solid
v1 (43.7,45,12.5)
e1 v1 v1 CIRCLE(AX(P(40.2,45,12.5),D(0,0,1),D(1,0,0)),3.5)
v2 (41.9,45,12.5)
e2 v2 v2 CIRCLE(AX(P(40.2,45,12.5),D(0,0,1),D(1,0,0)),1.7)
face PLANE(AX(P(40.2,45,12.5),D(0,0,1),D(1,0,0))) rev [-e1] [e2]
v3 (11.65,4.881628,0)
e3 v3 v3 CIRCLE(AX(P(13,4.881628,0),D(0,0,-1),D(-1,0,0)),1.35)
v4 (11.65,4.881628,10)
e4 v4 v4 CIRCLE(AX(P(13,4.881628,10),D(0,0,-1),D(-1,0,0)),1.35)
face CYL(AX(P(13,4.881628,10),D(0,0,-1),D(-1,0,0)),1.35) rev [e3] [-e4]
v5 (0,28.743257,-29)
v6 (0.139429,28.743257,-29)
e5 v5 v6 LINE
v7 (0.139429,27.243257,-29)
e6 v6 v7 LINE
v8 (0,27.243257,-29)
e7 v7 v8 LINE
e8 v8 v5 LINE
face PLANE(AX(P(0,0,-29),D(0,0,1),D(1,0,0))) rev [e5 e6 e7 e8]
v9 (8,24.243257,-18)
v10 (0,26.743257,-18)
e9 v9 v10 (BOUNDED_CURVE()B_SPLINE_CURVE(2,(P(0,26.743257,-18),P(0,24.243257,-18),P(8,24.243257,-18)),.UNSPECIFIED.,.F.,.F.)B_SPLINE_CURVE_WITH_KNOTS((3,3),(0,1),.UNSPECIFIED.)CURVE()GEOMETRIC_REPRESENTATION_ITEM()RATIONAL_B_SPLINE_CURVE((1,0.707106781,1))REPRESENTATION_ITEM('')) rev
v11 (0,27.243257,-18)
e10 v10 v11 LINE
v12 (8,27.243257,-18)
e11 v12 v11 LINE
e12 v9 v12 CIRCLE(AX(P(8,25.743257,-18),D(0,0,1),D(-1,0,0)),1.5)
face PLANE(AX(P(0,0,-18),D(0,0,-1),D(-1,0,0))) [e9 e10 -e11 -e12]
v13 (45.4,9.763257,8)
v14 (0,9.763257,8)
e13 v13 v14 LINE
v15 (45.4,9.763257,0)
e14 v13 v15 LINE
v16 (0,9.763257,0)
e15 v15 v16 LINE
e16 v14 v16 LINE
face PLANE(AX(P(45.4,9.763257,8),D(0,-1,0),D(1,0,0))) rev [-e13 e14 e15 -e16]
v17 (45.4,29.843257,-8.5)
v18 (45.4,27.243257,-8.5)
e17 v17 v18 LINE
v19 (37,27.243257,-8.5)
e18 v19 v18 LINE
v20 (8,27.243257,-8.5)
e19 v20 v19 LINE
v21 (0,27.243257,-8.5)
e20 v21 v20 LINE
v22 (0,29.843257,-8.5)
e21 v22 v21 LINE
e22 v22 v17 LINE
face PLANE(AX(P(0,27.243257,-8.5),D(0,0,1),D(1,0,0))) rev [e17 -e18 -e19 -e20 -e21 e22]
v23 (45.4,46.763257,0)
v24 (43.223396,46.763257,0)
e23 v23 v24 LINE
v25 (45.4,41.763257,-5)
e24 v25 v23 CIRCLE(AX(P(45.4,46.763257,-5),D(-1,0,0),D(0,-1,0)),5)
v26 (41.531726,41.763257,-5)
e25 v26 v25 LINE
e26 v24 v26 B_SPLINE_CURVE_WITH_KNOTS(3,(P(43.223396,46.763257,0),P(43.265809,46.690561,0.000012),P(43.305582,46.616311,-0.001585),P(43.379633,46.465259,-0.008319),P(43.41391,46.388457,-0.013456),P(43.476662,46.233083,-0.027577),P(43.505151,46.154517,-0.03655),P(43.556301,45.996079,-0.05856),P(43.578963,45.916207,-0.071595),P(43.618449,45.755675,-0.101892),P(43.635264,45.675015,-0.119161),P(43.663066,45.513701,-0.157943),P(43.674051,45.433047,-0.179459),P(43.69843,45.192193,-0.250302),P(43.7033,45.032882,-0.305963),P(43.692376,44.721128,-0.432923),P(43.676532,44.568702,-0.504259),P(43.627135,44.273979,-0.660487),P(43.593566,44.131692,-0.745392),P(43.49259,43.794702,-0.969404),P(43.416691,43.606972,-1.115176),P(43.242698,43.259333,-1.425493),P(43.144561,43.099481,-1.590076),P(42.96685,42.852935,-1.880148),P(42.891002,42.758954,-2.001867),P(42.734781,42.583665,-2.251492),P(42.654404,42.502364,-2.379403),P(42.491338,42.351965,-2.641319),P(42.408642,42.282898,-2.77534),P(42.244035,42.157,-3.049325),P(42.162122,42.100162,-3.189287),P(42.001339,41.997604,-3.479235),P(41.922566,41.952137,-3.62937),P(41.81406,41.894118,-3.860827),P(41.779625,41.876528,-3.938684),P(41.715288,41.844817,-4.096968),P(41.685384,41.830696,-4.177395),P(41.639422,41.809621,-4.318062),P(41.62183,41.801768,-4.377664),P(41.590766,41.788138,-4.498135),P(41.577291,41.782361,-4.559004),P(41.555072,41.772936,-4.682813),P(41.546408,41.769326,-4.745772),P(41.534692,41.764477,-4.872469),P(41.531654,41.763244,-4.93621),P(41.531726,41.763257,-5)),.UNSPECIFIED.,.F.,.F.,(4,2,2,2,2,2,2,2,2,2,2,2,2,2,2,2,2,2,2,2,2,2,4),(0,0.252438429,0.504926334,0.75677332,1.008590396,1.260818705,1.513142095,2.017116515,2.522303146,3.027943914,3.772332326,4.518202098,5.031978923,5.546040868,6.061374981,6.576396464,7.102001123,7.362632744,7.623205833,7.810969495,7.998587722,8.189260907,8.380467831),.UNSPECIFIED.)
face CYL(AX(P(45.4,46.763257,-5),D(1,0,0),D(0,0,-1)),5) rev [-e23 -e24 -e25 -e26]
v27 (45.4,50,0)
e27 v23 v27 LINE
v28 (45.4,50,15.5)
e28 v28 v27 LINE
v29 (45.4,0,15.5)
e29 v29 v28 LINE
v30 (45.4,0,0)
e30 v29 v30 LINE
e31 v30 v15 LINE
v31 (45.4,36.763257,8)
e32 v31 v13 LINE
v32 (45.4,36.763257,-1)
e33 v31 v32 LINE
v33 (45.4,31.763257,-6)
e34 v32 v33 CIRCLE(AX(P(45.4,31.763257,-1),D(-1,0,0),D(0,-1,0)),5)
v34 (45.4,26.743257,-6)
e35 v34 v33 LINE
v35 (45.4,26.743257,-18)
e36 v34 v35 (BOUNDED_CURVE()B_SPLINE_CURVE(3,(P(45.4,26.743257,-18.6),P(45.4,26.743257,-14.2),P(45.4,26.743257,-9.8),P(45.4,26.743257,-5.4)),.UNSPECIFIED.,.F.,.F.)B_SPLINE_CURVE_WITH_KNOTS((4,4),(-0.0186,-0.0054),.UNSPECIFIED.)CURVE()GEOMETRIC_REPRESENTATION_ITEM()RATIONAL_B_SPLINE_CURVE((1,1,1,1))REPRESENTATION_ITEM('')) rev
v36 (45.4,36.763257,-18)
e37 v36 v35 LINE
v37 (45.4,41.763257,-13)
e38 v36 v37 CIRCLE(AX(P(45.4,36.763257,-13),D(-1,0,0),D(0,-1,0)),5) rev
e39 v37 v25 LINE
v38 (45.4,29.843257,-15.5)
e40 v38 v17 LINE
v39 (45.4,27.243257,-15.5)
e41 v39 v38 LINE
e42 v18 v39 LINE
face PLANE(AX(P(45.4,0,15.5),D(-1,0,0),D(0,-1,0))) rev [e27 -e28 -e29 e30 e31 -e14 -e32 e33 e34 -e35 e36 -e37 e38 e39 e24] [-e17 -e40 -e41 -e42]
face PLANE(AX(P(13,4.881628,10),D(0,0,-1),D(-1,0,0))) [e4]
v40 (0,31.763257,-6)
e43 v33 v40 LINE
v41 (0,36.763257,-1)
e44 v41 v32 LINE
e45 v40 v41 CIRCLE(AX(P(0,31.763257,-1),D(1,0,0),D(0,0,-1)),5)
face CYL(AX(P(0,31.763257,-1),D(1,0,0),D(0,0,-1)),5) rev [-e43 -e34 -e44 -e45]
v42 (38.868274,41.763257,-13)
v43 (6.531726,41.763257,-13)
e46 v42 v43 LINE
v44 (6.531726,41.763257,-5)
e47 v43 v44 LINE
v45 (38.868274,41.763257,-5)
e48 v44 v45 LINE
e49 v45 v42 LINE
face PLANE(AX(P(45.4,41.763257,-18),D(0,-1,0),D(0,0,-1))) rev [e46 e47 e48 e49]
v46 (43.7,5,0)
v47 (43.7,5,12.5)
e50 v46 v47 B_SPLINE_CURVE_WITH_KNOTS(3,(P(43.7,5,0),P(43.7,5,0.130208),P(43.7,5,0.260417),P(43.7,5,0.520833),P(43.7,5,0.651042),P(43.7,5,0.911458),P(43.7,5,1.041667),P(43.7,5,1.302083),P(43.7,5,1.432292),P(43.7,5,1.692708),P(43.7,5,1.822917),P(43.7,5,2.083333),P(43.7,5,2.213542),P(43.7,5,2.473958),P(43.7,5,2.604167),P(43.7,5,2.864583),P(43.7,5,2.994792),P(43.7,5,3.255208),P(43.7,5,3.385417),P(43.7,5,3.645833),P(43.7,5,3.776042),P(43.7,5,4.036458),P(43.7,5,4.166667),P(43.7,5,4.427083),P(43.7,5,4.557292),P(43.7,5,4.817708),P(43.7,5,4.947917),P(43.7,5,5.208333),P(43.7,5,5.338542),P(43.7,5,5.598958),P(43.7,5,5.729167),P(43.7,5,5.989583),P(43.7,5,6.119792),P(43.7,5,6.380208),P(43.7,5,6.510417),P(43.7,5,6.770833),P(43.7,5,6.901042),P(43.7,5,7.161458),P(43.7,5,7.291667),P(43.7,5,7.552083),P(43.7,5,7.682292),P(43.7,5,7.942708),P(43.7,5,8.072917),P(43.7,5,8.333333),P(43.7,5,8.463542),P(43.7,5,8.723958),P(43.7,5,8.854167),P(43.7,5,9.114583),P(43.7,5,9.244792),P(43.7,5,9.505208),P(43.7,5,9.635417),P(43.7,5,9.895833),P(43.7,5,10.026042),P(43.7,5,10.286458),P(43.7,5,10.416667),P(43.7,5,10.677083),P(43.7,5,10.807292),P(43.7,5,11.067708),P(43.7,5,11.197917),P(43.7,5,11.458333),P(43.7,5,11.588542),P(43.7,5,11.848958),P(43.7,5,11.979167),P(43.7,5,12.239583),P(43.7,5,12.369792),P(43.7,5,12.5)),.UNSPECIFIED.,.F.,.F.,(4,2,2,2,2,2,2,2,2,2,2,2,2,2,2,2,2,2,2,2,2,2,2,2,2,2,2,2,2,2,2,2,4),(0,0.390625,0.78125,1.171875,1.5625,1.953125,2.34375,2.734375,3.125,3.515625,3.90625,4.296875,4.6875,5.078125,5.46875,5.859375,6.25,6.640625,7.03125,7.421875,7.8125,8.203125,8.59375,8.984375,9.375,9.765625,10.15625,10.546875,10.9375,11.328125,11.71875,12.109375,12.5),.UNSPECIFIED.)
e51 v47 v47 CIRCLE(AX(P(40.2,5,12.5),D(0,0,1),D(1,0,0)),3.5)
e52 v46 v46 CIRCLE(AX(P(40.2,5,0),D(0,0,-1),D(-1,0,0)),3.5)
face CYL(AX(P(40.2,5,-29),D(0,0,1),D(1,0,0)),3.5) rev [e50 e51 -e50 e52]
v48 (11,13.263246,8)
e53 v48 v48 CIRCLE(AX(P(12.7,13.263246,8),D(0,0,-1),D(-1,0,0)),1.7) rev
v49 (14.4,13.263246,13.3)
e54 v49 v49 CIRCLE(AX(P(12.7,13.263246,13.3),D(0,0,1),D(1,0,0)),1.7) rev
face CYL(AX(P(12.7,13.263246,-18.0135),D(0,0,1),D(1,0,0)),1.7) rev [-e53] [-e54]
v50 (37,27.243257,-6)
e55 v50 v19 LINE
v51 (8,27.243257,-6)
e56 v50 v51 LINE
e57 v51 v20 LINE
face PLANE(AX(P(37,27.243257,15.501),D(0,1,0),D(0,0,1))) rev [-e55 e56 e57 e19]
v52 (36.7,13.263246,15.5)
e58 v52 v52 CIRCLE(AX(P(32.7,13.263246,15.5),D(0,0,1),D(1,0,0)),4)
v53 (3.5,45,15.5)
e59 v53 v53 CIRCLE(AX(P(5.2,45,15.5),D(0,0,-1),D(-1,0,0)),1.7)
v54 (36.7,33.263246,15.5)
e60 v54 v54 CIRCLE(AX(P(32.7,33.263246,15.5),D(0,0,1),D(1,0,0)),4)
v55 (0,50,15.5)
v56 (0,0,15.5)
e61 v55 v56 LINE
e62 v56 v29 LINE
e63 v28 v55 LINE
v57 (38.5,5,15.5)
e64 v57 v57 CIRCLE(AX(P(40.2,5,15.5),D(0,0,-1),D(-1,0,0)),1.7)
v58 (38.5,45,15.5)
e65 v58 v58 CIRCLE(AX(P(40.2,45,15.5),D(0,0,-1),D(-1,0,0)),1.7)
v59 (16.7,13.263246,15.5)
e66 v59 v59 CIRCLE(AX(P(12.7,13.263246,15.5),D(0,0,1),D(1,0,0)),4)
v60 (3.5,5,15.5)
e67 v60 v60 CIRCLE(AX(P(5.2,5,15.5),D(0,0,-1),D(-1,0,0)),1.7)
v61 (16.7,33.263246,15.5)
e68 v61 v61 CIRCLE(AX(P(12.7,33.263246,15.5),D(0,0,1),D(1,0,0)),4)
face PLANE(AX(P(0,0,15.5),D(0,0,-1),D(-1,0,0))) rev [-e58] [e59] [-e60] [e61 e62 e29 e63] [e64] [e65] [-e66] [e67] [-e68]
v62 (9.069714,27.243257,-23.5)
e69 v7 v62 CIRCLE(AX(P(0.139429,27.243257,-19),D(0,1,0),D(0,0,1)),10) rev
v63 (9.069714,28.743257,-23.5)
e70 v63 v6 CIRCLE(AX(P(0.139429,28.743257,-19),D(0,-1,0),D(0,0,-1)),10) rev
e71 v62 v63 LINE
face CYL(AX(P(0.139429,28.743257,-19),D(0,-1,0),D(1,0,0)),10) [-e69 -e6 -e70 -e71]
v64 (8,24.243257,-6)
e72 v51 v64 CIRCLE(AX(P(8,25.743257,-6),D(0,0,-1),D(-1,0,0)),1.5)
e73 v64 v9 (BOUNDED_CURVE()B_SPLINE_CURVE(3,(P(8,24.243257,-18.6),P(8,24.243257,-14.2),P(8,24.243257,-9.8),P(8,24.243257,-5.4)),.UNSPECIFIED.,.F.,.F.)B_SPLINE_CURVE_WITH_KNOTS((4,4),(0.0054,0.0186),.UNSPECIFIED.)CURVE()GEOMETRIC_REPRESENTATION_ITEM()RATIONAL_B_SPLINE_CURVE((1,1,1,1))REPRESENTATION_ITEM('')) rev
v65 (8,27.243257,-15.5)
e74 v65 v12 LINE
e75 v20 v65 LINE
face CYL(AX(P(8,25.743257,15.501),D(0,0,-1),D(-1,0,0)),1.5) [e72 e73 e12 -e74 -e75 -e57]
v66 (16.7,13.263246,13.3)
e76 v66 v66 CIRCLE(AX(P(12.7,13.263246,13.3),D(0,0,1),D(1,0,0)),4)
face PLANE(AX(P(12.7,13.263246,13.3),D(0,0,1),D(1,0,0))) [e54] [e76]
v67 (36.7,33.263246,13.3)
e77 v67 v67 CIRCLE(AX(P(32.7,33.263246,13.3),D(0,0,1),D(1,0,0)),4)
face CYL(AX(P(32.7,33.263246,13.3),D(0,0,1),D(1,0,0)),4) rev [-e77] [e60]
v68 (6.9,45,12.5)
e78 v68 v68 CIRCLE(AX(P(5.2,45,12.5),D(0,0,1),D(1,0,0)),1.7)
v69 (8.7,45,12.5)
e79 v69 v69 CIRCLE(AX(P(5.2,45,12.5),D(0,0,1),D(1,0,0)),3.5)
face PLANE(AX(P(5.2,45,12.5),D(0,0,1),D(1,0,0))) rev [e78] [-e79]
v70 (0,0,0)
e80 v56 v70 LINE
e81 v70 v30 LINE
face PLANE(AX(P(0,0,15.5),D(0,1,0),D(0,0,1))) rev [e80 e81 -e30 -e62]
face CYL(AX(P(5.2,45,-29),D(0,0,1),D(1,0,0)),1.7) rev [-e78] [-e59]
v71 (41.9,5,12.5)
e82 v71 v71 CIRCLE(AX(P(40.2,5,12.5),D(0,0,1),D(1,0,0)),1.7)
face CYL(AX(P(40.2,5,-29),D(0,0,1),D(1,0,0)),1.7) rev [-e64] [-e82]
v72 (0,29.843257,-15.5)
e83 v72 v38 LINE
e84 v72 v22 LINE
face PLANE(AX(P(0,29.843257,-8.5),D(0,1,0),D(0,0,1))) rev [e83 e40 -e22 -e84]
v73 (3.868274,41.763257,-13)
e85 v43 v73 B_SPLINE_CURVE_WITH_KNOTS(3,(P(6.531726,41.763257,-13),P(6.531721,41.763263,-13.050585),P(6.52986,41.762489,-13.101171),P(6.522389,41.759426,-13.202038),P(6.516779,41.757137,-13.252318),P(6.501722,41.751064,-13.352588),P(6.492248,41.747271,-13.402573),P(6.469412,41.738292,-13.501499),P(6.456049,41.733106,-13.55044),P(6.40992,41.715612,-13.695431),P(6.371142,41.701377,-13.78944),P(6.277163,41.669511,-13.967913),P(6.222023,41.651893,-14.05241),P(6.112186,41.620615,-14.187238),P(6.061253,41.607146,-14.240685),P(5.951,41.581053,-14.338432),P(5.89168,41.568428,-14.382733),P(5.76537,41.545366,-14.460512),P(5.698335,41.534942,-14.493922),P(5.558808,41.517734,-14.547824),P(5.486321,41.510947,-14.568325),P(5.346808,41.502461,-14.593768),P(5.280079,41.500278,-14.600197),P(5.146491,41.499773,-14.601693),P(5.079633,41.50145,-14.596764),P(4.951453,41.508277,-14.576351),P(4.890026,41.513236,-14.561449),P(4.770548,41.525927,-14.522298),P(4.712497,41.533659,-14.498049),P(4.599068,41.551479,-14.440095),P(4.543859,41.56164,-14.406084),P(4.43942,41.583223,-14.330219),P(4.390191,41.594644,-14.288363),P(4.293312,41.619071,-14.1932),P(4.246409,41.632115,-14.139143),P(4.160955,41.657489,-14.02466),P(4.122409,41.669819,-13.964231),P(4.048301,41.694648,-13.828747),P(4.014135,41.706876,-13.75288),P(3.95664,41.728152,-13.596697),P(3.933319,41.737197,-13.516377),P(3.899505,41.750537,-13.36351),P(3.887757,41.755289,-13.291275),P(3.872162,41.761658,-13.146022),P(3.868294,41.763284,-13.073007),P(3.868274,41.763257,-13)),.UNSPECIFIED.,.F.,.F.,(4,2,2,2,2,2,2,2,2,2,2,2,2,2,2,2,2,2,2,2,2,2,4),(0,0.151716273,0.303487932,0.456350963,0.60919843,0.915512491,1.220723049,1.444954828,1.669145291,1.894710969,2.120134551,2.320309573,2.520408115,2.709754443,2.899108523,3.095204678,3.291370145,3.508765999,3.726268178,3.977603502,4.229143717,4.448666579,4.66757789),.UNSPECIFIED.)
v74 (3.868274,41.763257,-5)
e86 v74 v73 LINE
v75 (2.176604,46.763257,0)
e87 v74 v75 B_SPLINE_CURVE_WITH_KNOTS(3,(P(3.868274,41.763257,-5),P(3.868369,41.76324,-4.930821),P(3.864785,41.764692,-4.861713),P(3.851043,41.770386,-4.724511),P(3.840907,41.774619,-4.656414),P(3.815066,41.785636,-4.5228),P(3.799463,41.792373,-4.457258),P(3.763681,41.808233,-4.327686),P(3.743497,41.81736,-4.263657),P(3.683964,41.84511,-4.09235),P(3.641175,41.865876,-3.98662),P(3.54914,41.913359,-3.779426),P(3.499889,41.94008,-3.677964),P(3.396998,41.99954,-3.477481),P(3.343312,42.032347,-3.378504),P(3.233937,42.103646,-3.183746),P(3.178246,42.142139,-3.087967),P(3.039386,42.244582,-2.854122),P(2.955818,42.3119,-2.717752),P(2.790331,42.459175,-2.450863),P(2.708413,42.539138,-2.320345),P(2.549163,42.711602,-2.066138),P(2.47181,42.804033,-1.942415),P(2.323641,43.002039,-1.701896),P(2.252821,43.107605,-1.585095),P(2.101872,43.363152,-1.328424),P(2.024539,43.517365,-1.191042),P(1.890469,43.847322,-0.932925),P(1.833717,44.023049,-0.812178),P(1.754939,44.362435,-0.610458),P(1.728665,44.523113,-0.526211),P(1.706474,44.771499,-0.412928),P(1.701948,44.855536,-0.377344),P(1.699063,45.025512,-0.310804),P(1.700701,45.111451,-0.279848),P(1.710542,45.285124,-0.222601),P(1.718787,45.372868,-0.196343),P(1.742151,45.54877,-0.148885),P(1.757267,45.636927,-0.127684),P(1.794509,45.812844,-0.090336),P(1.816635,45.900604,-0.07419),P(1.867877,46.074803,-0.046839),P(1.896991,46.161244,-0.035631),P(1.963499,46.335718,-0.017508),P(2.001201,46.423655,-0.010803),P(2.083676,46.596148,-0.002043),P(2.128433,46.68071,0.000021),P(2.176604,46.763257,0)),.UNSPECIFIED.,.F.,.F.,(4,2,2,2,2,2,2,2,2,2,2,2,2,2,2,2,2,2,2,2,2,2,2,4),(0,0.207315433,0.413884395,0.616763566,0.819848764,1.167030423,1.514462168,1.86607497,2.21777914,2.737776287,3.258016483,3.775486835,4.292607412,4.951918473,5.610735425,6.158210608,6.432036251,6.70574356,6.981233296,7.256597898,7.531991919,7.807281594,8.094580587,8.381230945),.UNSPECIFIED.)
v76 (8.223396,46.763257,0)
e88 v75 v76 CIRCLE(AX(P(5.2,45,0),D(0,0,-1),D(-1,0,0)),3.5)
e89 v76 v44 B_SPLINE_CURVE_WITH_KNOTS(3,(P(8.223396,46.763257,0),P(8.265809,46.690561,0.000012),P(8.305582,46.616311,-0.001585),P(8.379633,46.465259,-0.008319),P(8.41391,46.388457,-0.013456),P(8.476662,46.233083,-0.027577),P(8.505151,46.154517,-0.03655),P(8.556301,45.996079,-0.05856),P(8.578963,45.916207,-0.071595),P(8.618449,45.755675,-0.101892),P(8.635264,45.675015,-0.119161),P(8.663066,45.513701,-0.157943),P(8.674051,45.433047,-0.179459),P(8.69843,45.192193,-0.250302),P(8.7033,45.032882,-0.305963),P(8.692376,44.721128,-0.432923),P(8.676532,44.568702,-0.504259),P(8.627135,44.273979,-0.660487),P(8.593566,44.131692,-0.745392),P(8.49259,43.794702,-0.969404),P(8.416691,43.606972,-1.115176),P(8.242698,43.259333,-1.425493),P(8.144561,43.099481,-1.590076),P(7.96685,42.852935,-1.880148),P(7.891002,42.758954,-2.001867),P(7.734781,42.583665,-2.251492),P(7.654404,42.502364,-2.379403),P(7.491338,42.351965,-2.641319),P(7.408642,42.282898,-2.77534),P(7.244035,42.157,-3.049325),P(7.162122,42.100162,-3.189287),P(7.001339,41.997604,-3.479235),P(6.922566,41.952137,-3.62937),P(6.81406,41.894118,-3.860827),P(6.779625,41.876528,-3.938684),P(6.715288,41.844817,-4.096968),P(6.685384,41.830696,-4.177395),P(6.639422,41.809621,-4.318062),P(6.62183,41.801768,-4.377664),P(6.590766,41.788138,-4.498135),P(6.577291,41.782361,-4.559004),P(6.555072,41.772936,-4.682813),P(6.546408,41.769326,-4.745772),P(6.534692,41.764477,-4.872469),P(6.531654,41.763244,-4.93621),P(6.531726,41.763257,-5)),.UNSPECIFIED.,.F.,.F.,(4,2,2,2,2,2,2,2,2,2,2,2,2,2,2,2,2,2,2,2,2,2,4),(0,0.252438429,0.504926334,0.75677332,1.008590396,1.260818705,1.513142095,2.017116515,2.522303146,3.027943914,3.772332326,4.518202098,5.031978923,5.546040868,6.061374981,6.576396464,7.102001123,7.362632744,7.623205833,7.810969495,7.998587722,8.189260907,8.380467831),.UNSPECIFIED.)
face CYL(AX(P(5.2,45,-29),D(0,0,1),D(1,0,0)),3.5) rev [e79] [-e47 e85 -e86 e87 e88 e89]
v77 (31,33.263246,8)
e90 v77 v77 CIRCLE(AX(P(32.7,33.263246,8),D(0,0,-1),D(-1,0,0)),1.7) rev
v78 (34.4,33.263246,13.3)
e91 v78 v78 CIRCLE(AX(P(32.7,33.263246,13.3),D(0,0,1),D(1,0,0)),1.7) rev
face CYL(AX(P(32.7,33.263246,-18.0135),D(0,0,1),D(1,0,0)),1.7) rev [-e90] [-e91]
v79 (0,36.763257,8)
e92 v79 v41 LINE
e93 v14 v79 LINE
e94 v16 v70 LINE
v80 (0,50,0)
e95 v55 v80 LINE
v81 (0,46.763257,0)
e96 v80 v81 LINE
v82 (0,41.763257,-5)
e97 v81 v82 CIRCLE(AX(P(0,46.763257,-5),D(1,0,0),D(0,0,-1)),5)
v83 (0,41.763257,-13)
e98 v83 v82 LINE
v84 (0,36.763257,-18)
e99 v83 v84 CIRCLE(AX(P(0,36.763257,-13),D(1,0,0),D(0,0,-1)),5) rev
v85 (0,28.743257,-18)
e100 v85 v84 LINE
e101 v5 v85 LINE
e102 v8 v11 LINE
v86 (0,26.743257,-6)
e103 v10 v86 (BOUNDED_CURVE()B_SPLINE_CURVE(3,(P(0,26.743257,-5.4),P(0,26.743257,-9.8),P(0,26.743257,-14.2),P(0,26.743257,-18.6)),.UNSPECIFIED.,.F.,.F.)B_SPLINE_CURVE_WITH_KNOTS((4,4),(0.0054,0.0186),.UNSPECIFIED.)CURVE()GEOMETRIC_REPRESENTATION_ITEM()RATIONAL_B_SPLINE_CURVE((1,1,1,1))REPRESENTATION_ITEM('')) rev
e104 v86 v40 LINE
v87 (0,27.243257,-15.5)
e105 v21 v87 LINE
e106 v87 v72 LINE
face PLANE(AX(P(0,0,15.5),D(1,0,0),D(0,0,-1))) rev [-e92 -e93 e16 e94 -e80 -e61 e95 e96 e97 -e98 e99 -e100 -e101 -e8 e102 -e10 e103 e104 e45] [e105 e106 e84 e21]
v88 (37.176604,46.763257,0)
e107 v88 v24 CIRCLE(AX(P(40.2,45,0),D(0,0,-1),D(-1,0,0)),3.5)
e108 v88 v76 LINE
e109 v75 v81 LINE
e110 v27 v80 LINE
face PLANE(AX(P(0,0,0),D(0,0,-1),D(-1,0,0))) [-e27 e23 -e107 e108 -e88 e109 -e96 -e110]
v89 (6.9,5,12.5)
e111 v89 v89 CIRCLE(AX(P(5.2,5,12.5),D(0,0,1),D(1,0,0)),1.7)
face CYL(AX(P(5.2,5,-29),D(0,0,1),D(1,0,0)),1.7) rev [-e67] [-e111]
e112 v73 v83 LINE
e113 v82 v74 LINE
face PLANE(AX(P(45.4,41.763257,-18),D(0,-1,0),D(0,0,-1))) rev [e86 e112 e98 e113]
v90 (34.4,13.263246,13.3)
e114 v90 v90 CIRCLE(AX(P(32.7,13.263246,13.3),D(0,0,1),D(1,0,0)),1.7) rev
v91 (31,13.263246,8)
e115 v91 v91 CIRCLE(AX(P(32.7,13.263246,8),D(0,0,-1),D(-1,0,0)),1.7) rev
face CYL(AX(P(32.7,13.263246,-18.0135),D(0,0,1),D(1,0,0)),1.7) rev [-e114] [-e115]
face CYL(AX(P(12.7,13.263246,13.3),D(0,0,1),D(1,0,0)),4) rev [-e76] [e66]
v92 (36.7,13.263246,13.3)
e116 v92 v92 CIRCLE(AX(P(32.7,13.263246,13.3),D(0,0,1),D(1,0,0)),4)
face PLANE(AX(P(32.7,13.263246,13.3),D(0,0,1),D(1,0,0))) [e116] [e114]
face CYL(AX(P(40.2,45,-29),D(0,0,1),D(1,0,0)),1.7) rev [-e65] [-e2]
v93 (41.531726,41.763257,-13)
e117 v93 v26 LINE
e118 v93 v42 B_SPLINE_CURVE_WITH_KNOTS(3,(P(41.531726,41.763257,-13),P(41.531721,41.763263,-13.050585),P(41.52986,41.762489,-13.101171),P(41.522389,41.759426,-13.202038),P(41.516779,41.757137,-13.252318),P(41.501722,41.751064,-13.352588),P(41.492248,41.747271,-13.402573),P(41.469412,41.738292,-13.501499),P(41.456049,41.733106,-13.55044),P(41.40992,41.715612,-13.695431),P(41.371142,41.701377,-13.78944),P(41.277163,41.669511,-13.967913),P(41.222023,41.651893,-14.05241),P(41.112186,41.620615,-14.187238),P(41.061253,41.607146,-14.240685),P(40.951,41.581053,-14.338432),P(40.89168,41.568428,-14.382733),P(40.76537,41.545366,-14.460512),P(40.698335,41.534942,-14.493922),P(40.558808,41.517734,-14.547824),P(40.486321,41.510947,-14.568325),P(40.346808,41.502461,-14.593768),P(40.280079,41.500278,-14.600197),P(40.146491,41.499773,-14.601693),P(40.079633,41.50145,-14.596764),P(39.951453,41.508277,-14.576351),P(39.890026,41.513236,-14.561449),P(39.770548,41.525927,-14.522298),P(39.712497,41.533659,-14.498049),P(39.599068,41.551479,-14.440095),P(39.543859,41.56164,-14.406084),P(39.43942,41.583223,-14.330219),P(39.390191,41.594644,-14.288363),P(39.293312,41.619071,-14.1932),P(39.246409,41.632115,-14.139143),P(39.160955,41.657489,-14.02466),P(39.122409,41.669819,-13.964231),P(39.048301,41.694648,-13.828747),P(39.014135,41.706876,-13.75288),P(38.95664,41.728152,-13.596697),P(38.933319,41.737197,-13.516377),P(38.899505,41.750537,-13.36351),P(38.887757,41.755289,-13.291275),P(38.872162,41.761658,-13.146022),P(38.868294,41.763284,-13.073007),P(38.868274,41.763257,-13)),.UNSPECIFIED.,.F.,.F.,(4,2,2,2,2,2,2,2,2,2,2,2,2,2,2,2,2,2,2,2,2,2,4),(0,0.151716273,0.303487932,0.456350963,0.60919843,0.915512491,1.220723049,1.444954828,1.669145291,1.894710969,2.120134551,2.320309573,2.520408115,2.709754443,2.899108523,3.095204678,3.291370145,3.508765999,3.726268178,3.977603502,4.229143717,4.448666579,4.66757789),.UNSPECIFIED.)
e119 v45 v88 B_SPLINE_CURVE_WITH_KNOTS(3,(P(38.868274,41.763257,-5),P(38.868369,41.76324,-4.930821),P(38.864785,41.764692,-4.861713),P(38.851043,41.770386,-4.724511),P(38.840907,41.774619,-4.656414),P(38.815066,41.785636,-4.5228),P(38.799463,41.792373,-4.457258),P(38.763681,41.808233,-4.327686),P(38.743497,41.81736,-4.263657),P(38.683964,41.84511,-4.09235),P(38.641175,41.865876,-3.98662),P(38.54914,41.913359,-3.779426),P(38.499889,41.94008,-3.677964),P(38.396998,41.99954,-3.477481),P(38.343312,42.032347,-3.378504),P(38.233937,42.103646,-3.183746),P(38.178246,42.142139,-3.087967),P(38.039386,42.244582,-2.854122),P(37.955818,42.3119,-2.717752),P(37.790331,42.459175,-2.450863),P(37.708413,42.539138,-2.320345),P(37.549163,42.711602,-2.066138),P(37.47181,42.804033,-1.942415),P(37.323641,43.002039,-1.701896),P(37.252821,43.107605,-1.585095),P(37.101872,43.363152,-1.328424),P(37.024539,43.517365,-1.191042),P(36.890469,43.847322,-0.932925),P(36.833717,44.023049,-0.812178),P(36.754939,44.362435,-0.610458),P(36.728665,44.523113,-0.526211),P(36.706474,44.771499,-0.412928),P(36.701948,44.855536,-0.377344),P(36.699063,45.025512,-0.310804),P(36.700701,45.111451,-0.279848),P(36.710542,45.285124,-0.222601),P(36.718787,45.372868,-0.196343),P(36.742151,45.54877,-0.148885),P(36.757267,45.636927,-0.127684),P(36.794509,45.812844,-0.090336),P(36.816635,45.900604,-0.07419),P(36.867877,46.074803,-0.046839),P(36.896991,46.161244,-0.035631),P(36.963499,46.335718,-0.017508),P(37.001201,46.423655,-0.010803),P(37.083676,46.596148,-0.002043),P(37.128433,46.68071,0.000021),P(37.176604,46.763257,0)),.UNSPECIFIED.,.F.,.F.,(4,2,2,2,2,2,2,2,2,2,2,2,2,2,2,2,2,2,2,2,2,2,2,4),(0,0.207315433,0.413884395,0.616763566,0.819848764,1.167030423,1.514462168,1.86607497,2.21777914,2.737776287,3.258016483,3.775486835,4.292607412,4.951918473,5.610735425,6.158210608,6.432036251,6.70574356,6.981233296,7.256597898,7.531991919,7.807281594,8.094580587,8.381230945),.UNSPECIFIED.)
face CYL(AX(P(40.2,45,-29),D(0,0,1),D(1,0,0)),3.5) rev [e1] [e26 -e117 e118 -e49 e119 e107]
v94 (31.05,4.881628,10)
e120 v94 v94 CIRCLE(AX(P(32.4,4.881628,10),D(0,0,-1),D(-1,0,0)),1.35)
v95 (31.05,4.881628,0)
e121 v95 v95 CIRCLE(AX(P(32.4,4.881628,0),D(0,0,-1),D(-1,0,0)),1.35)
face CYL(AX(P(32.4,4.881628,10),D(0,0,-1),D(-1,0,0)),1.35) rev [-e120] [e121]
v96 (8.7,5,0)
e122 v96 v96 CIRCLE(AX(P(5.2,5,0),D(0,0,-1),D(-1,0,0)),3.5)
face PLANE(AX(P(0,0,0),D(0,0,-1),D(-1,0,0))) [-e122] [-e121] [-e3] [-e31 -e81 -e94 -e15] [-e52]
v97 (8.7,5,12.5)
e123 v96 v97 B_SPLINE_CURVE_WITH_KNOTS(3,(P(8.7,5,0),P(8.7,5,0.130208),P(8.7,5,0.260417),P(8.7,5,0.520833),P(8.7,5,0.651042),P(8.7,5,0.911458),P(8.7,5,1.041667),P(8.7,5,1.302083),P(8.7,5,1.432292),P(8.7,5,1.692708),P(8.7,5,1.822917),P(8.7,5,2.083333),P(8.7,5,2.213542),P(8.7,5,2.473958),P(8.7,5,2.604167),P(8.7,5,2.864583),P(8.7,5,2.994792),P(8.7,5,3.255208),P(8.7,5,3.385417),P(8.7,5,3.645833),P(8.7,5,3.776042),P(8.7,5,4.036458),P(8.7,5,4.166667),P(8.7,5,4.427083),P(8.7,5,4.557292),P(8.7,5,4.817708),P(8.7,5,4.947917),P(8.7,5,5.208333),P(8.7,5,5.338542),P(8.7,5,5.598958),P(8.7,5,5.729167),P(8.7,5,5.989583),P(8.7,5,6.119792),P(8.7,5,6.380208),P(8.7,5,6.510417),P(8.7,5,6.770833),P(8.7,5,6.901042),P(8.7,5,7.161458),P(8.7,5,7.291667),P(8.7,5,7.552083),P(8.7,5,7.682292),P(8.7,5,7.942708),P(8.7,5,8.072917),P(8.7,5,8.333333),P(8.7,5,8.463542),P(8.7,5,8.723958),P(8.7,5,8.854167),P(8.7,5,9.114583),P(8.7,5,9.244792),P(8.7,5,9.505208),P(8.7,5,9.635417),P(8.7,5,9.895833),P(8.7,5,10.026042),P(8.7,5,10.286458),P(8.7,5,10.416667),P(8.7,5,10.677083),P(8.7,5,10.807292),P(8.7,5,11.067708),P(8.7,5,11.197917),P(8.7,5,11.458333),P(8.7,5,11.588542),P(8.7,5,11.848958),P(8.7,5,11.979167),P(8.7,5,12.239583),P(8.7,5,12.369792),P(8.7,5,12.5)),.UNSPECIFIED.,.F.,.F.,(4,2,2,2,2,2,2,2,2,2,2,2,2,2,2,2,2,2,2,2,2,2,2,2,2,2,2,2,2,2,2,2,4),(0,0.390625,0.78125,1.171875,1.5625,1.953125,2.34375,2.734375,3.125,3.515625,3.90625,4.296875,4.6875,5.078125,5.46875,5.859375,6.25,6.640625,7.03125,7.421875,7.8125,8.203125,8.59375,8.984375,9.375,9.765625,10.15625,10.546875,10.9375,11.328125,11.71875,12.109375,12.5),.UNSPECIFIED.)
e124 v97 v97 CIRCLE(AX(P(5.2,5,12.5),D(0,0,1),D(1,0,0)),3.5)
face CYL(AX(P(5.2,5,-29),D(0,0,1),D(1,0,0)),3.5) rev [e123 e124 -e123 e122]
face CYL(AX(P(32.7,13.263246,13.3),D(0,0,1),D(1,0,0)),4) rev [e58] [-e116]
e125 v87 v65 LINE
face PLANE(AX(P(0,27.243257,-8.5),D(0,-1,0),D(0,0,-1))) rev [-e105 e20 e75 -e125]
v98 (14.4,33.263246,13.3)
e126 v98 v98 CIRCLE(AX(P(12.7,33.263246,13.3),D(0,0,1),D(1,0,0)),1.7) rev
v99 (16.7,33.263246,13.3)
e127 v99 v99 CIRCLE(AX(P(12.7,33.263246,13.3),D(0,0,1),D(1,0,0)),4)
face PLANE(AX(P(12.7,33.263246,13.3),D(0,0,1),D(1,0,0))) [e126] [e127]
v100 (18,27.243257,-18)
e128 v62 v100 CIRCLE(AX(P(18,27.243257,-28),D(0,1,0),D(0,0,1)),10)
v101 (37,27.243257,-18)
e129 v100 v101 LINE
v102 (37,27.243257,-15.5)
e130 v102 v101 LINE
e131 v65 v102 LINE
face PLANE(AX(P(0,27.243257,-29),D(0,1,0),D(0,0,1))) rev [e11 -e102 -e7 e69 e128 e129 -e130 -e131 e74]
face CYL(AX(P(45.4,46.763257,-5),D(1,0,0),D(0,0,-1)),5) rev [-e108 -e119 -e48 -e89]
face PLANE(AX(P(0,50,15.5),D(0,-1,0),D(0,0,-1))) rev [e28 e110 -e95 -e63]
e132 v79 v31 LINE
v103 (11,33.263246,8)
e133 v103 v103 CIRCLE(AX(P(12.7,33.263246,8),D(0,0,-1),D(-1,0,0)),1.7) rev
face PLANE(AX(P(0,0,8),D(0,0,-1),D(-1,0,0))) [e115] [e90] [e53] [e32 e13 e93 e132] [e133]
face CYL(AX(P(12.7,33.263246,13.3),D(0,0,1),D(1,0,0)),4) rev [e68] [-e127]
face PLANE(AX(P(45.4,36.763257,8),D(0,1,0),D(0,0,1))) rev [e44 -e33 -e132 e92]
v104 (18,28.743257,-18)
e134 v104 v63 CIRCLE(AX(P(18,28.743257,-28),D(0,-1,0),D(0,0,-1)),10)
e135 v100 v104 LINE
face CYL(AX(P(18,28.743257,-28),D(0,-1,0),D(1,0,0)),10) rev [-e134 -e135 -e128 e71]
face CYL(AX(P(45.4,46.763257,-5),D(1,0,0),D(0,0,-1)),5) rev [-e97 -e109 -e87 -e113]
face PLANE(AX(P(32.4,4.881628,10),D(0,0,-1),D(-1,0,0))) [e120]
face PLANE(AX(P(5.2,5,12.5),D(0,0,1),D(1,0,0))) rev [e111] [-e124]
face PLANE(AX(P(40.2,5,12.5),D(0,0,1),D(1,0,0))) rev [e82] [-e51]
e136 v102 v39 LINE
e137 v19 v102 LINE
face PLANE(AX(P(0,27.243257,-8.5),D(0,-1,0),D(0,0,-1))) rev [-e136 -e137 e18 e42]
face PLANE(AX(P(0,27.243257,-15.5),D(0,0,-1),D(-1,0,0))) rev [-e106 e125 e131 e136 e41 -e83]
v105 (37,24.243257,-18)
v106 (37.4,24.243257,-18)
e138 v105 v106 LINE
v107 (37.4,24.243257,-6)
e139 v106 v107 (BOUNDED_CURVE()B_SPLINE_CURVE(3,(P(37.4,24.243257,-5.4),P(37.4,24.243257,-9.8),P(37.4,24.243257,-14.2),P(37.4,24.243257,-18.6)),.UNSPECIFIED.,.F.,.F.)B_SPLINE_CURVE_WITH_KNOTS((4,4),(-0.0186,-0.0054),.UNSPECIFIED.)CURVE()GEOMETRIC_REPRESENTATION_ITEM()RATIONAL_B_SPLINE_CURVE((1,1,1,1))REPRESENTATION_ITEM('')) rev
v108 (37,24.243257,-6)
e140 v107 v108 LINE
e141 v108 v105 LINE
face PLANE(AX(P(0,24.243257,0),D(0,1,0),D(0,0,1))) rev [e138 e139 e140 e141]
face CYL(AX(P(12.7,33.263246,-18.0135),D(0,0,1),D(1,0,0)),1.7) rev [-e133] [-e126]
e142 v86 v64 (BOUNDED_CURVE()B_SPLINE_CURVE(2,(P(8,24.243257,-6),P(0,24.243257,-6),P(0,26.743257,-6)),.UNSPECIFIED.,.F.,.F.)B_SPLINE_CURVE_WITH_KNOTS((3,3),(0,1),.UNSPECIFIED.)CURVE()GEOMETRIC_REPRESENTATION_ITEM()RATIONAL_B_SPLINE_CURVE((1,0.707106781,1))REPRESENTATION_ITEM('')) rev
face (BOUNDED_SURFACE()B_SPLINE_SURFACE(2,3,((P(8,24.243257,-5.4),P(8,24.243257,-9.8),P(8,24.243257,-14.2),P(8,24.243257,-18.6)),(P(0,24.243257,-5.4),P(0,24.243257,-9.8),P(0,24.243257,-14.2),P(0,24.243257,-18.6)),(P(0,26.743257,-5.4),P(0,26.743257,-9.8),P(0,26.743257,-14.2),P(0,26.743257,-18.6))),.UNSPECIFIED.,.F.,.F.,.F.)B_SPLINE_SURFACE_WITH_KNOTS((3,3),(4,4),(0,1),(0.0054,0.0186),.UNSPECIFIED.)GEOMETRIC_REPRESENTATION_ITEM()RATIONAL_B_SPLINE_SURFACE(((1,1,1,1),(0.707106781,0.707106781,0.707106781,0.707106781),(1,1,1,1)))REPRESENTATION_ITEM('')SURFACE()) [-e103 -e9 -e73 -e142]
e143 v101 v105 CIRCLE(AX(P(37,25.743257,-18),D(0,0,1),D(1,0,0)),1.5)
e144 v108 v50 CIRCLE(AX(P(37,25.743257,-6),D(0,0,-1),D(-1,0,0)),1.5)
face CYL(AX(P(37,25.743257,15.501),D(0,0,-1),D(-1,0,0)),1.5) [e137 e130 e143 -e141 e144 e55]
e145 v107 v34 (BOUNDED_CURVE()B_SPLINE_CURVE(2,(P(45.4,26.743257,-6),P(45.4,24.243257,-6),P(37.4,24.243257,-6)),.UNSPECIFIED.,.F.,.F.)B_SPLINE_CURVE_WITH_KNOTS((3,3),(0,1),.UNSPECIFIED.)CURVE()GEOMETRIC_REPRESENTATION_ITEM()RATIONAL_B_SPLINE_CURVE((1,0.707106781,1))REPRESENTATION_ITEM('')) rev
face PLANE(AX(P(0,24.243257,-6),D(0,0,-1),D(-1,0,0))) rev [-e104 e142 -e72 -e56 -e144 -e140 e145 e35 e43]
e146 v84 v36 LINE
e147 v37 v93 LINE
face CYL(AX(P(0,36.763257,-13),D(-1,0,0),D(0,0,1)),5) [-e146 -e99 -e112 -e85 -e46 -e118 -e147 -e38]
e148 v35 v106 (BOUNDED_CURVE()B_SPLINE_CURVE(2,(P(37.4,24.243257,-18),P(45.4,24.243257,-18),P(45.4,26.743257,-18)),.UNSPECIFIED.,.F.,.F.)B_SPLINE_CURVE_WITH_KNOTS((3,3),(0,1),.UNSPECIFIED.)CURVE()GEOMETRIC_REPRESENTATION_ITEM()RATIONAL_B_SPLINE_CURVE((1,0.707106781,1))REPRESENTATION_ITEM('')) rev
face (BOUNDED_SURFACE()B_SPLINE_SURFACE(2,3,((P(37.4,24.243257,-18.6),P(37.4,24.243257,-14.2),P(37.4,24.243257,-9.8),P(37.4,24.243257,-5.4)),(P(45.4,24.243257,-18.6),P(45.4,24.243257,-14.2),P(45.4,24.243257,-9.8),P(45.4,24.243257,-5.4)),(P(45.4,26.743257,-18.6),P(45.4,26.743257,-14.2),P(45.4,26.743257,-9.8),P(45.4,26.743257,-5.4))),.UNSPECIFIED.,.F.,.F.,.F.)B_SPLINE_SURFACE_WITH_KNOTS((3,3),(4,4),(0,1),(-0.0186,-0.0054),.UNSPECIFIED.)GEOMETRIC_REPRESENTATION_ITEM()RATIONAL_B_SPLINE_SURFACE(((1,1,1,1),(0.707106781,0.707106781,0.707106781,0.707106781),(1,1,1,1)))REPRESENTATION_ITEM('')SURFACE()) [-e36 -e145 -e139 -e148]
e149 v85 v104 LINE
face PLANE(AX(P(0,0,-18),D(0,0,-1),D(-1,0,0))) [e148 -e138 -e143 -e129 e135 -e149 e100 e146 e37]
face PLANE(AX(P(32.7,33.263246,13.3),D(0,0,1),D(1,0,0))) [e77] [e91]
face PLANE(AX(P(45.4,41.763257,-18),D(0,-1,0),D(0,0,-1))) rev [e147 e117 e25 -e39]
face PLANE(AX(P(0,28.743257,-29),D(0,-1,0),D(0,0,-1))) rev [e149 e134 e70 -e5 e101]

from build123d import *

# Parameters (mm, degrees)
SKETCH1_W           = 45.4
SKETCH1_H           = 50
BOSS_EXTRUDE1_DEPTH = 15.5
SKETCH2_W           = 45.4
SKETCH2_H           = 27
CUT_EXTRUDE1_DEPTH  = 8
SKETCH7_W           = 45.4
SKETCH7_H           = 5
BOSS_EXTRUDE2_DEPTH = 18
SKETCH8_W           = 45.4
SKETCH8_H           = 12
BOSS_EXTRUDE3_DEPTH = 12.52
CUT_EXTRUDE2_REACH  = 77.388
SKETCH11_W          = 7
SKETCH11_H          = 2.6
CUT_EXTRUDE3_DEPTH  = 70.893919621
FILLET1_SIZE        = 2.5
FILLET1_SIZE_2      = 8
CUT_EXTRUDE4_REACH  = 77.388
SKETCH13_R          = 1.7
SKETCH14_W          = 8
SKETCH14_H          = 1.5
BOSS_EXTRUDE4_DEPTH = 11
FILLET3_R           = 10
FILLET4_R           = 10
SKETCH15_R          = 1.7
CUT_EXTRUDE6_DEPTH  = 81.878983729
SKETCH16_R          = 3.5
CUT_EXTRUDE7_DEPTH  = 80.267963321
SKETCH17_R          = 4
CUT_EXTRUDE8_DEPTH  = 2.2
FILLET5_R           = 5
FILLET6_R           = 5
FILLET7_R           = 5
SKETCH18_R          = 1.35
CUT_EXTRUDE9_DEPTH  = 10


with BuildPart() as part:
    # Sketch1 → Boss-Extrude1 (new body)
    with BuildSketch(Plane.XY):
        with Locations((22.7, 25)):
            Rectangle(SKETCH1_W, SKETCH1_H)
    extrude(amount=BOSS_EXTRUDE1_DEPTH)

    # Sketch2 → Cut-Extrude1 (cut)
    with BuildSketch(Plane(origin=(0, 0, 0), x_dir=(-1, 0, 0), z_dir=(0, 0, -1))):
        with Locations((-22.7, 23.263256753)):
            Rectangle(SKETCH2_W, SKETCH2_H)
    extrude(amount=-CUT_EXTRUDE1_DEPTH, mode=Mode.SUBTRACT)

    # Sketch7 → Boss-Extrude2 (add)
    with BuildSketch(Plane(origin=(0, 0, 0), x_dir=(-1, 0, 0), z_dir=(0, 0, -1))):
        with Locations((-22.7, 39.263256753)):
            Rectangle(SKETCH7_W, SKETCH7_H)
    extrude(amount=BOSS_EXTRUDE2_DEPTH)

    # Sketch8 → Boss-Extrude3 (add)
    with BuildSketch(Plane.XZ.offset(-36.763256753)):
        with Locations((22.7, -12)):
            Rectangle(SKETCH8_W, SKETCH8_H)
    extrude(amount=BOSS_EXTRUDE3_DEPTH)

    # Sketch10 → Cut-Extrude2 (cut, up to next)
    with BuildSketch(Plane(origin=(0, 0, -18), x_dir=(-1, 0, 0), z_dir=(0, 0, -1)), mode=Mode.PRIVATE) as cut_extrude2_sk1:
        with BuildLine():
            Line((-37, 27.243256753), (-8, 27.243256753))
            ThreePointArc((-8, 27.243256753), (-9.5, 25.743256753), (-8, 24.243256753))
            Line((-8, 24.243256753), (-37, 24.243256753))
            ThreePointArc((-37, 24.243256753), (-35.5, 25.743256753), (-37, 27.243256753))
        make_face()
    cut_extrude2_tool1 = extrude(cut_extrude2_sk1.sketch, amount=-CUT_EXTRUDE2_REACH, mode=Mode.PRIVATE) & part.part
    add(cut_extrude2_tool1.solids().sort_by_distance((22.5, 25.743257, -18))[0], mode=Mode.SUBTRACT)

    # Sketch11 → Cut-Extrude3 (cut, through all)
    with BuildSketch(Plane(origin=(45.4, 0, 0), x_dir=(0, 0, -1), z_dir=(1, 0, 0))):
        with Locations((12, 28.543256753)):
            Rectangle(SKETCH11_W, SKETCH11_H)
    extrude(amount=-CUT_EXTRUDE3_DEPTH, mode=Mode.SUBTRACT)

    # Fillet1
    # an asymmetric fillet: 8, 2.5 mm, written as the material it takes off along each edge
    with BuildSketch(Plane(origin=(0, 24.243256753, 14), x_dir=(0, 1, 0), z_dir=(0, 0, -1))) as fillet1_piece_1_section:
        with BuildLine():
            Bezier((FILLET1_SIZE, 0), (0, 0), (0, FILLET1_SIZE_2), weights=[1, 0.707106781, 1])
            Line((0, FILLET1_SIZE_2), (0, 0))
            Line((0, 0), (FILLET1_SIZE, 0))
        make_face()
    fillet1_piece_1 = extrude(amount=52, mode=Mode.PRIVATE)
    fillet1_piece_1 = split(fillet1_piece_1, bisect_by=Plane(origin=(1.786931274, 24.8016736, 8), z_dir=(0, 0, -1)), keep=Keep.TOP, mode=Mode.PRIVATE)
    add(fillet1_piece_1, mode=Mode.SUBTRACT)
    with BuildSketch(Plane(origin=(45.4, 24.243256753, -38), x_dir=(0, 1, 0), z_dir=(0, 0, 1))) as fillet1_piece_2_section:
        with BuildLine():
            Bezier((FILLET1_SIZE, 0), (0, 0), (0, FILLET1_SIZE_2), weights=[1, 0.707106781, 1])
            Line((0, FILLET1_SIZE_2), (0, 0))
            Line((0, 0), (FILLET1_SIZE, 0))
        make_face()
    fillet1_piece_2 = extrude(amount=52, mode=Mode.PRIVATE)
    fillet1_piece_2 = split(fillet1_piece_2, bisect_by=Plane(origin=(43.613068726, 24.8016736, 8), z_dir=(0, 0, -1)), keep=Keep.TOP, mode=Mode.PRIVATE)
    add(fillet1_piece_2, mode=Mode.SUBTRACT)

    # Sketch13 → Cut-Extrude4 (cut, up to next)
    with BuildSketch(Plane.XY.offset(15.5), mode=Mode.PRIVATE) as cut_extrude4_sk1:
        with Locations((12.7, 33.263245951)):
            Circle(SKETCH13_R)
    cut_extrude4_tool1 = extrude(cut_extrude4_sk1.sketch, amount=-CUT_EXTRUDE4_REACH, mode=Mode.PRIVATE) & part.part
    # Sketch13 → Cut-Extrude4 (cut, up to next)
    with BuildSketch(Plane.XY.offset(15.5), mode=Mode.PRIVATE) as cut_extrude4_sk2:
        with Locations((32.7, 33.263245951)):
            Circle(SKETCH13_R)
    cut_extrude4_tool2 = extrude(cut_extrude4_sk2.sketch, amount=-CUT_EXTRUDE4_REACH, mode=Mode.PRIVATE) & part.part
    # Sketch13 → Cut-Extrude4 (cut, up to next)
    with BuildSketch(Plane.XY.offset(15.5), mode=Mode.PRIVATE) as cut_extrude4_sk3:
        with Locations((32.7, 13.263245951)):
            Circle(SKETCH13_R)
    cut_extrude4_tool3 = extrude(cut_extrude4_sk3.sketch, amount=-CUT_EXTRUDE4_REACH, mode=Mode.PRIVATE) & part.part
    # Sketch13 → Cut-Extrude4 (cut, up to next)
    with BuildSketch(Plane.XY.offset(15.5), mode=Mode.PRIVATE) as cut_extrude4_sk4:
        with Locations((12.7, 13.263245951)):
            Circle(SKETCH13_R)
    cut_extrude4_tool4 = extrude(cut_extrude4_sk4.sketch, amount=-CUT_EXTRUDE4_REACH, mode=Mode.PRIVATE) & part.part
    add(cut_extrude4_tool1.solids().sort_by_distance((12.7, 33.263246, 15.5))[0], mode=Mode.SUBTRACT)
    add(cut_extrude4_tool2.solids().sort_by_distance((32.7, 33.263246, 15.5))[0], mode=Mode.SUBTRACT)
    add(cut_extrude4_tool3.solids().sort_by_distance((32.7, 13.263246, 15.5))[0], mode=Mode.SUBTRACT)
    add(cut_extrude4_tool4.solids().sort_by_distance((12.7, 13.263246, 15.5))[0], mode=Mode.SUBTRACT)

    # Sketch14 → Boss-Extrude4 (add)
    with BuildSketch(Plane(origin=(0, 0, -18), x_dir=(-1, 0, 0), z_dir=(0, 0, -1))):
        with Locations((-4, 27.993256753)):
            Rectangle(SKETCH14_W, SKETCH14_H)
    extrude(amount=BOSS_EXTRUDE4_DEPTH)

    # Fillet3
    # the kernel refuses this fillet: 10 mm, written as the material it adds along each edge
    with BuildSketch(Plane(origin=(8, 28.743256753, -18), x_dir=(1, 0, 0), z_dir=(0, -1, 0))) as fillet3_piece_1:
        with BuildLine():
            CenterArc((FILLET3_R, -FILLET3_R), FILLET3_R, 90, 90)
            Line((0, -FILLET3_R), (0, 0))
            Line((0, 0), (FILLET3_R, 0))
        make_face()
    extrude(amount=1.5)

    # Fillet4
    # the kernel refuses this fillet: 10 mm, written as the material it takes off along each edge
    with BuildSketch(Plane(origin=(8, 48.394684502, -29), x_dir=(-1, 0, 0), z_dir=(0, -1, 0))) as fillet4_piece_1:
        with BuildLine():
            CenterArc((7.860571099, -10), FILLET4_R, 90, 63.25631605)
            Line((-1.06971445, -5.5), (-1.962743005, -5.05))
            ThreePointArc((-1.962743005, -5.05), (-1, -1), (-1, 0))
            Line((-1, 0), (0, 1))
            Line((0, 1), (7.860571099, 1))
            Line((7.860571099, 1), (7.860571099, 0))
        make_face()
    extrude(amount=40.802855497, mode=Mode.SUBTRACT)

    # Sketch15 → Cut-Extrude6 (cut, through all)
    with BuildSketch(Plane(origin=(0, 0, 15.5), x_dir=(-1, 0, 0), z_dir=(0, 0, -1))):
        with Locations((-5.2, 45)):
            Circle(SKETCH15_R)
        with Locations((-40.2, 45)):
            Circle(SKETCH15_R)
        with Locations((-40.2, 5)):
            Circle(SKETCH15_R)
        with Locations((-5.2, 5)):
            Circle(SKETCH15_R)
    extrude(amount=CUT_EXTRUDE6_DEPTH, mode=Mode.SUBTRACT)

    # Sketch16 → Cut-Extrude7 (cut, through all)
    with BuildSketch(Plane.XY.offset(12.5)):
        with Locations((5.2, 45)):
            Circle(SKETCH16_R)
        with Locations((40.2, 45)):
            Circle(SKETCH16_R)
        with Locations((40.2, 5)):
            Circle(SKETCH16_R)
        with Locations((5.2, 5)):
            Circle(SKETCH16_R)
    extrude(amount=-CUT_EXTRUDE7_DEPTH, mode=Mode.SUBTRACT)

    # Sketch17 → Cut-Extrude8 (cut)
    with BuildSketch(Plane.XY.offset(15.5)):
        with Locations((12.7, 33.263245951)):
            Circle(SKETCH17_R)
        with Locations((32.7, 33.263245951)):
            Circle(SKETCH17_R)
        with Locations((32.7, 13.263245951)):
            Circle(SKETCH17_R)
        with Locations((12.7, 13.263245951)):
            Circle(SKETCH17_R)
    extrude(amount=-CUT_EXTRUDE8_DEPTH, mode=Mode.SUBTRACT)

    # Fillet5
    fillet5_edges = [part.edges().sort_by_distance(p)[0] for p in [
        (22.7, 36.763256753, -6),
    ]]
    fillet(fillet5_edges, radius=FILLET5_R)

    # Fillet6
    fillet6_edges = [part.edges().sort_by_distance(p)[0] for p in [
        (22.7, 41.763256753, -18),
    ]]
    fillet(fillet6_edges, radius=FILLET6_R)

    # Fillet7
    # the kernel refuses this fillet: 5 mm, written as the material it adds along each edge
    with BuildSketch(Plane(origin=(51.368274369, 41.763256753, 0), x_dir=(0, 1, 0), z_dir=(-1, 0, 0))) as fillet7_piece_1_section:
        with BuildLine():
            CenterArc((FILLET7_R, FILLET7_R), FILLET7_R, 180, 90)
            Line((0, FILLET7_R), (0, 0))
            Line((0, 0), (FILLET7_R, 0))
        make_face()
    fillet7_piece_1 = extrude(amount=57.336548738, mode=Mode.PRIVATE)
    fillet7_piece_1 = split(fillet7_piece_1, bisect_by=Plane(origin=(0, 42.669837738, -1.260146255), z_dir=(1, 0, 0)), keep=Keep.TOP, mode=Mode.PRIVATE)
    fillet7_piece_1 = split(fillet7_piece_1, bisect_by=Plane(origin=(45.4, 42.669837738, -1.260146255), z_dir=(-1, 0, 0)), keep=Keep.TOP, mode=Mode.PRIVATE)
    fillet7_piece_1 = fillet7_piece_1 - Plane(origin=(40.2, 45, -1.260146255), x_dir=(1, 0, 0), z_dir=(0, 0, 1)) * Cylinder(3.5, 135, mode=Mode.PRIVATE)
    fillet7_piece_1 = fillet7_piece_1 - Plane(origin=(5.2, 45, -1.260146255), x_dir=(1, 0, 0), z_dir=(0, 0, 1)) * Cylinder(3.5, 135, mode=Mode.PRIVATE)
    with BuildSketch(Plane(origin=(45.4, 41.763256753, 0), x_dir=(0, 1, 0), z_dir=(-1, 0, 0))) as fillet7_piece_2_section:
        with BuildLine():
            CenterArc((FILLET7_R, FILLET7_R), FILLET7_R, 180, 90)
            Line((0, FILLET7_R), (0, 0))
            Line((0, 0), (FILLET7_R, 0))
        make_face()
    fillet7_piece_2 = extrude(amount=16.368274369, mode=Mode.PRIVATE)
    fillet7_piece_2 = fillet7_piece_2 - Plane(origin=(40.2, 45, -1.260146255), x_dir=(1, 0, 0), z_dir=(0, 0, 1)) * Cylinder(3.5, 53, mode=Mode.PRIVATE)
    with BuildSketch(Plane(origin=(16.368274369, 41.763256753, 0), x_dir=(0, 0, -1), z_dir=(-1, 0, 0))) as fillet7_piece_3_section:
        with BuildLine():
            CenterArc((FILLET7_R, -FILLET7_R), FILLET7_R, 90, 90)
            Line((0, -FILLET7_R), (0, 0))
            Line((0, 0), (FILLET7_R, 0))
        make_face()
    fillet7_piece_3 = extrude(amount=16.368274369, mode=Mode.PRIVATE)
    fillet7_piece_3 = fillet7_piece_3 - Plane(origin=(5.2, 45, -1.161012309), x_dir=(1, 0, 0), z_dir=(0, 0, 1)) * Cylinder(3.5, 53, mode=Mode.PRIVATE)
    add([fillet7_piece_1, fillet7_piece_2, fillet7_piece_3])

    # Sketch18 → Cut-Extrude9 (cut)
    with BuildSketch(Plane(origin=(0, 0, 0), x_dir=(-1, 0, 0), z_dir=(0, 0, -1))):
        with Locations((-32.4, 4.881628377)):
            Circle(SKETCH18_R)
        with Locations((-13, 4.881628377)):
            Circle(SKETCH18_R)
    extrude(amount=-CUT_EXTRUDE9_DEPTH, mode=Mode.SUBTRACT)


solid = part.part
